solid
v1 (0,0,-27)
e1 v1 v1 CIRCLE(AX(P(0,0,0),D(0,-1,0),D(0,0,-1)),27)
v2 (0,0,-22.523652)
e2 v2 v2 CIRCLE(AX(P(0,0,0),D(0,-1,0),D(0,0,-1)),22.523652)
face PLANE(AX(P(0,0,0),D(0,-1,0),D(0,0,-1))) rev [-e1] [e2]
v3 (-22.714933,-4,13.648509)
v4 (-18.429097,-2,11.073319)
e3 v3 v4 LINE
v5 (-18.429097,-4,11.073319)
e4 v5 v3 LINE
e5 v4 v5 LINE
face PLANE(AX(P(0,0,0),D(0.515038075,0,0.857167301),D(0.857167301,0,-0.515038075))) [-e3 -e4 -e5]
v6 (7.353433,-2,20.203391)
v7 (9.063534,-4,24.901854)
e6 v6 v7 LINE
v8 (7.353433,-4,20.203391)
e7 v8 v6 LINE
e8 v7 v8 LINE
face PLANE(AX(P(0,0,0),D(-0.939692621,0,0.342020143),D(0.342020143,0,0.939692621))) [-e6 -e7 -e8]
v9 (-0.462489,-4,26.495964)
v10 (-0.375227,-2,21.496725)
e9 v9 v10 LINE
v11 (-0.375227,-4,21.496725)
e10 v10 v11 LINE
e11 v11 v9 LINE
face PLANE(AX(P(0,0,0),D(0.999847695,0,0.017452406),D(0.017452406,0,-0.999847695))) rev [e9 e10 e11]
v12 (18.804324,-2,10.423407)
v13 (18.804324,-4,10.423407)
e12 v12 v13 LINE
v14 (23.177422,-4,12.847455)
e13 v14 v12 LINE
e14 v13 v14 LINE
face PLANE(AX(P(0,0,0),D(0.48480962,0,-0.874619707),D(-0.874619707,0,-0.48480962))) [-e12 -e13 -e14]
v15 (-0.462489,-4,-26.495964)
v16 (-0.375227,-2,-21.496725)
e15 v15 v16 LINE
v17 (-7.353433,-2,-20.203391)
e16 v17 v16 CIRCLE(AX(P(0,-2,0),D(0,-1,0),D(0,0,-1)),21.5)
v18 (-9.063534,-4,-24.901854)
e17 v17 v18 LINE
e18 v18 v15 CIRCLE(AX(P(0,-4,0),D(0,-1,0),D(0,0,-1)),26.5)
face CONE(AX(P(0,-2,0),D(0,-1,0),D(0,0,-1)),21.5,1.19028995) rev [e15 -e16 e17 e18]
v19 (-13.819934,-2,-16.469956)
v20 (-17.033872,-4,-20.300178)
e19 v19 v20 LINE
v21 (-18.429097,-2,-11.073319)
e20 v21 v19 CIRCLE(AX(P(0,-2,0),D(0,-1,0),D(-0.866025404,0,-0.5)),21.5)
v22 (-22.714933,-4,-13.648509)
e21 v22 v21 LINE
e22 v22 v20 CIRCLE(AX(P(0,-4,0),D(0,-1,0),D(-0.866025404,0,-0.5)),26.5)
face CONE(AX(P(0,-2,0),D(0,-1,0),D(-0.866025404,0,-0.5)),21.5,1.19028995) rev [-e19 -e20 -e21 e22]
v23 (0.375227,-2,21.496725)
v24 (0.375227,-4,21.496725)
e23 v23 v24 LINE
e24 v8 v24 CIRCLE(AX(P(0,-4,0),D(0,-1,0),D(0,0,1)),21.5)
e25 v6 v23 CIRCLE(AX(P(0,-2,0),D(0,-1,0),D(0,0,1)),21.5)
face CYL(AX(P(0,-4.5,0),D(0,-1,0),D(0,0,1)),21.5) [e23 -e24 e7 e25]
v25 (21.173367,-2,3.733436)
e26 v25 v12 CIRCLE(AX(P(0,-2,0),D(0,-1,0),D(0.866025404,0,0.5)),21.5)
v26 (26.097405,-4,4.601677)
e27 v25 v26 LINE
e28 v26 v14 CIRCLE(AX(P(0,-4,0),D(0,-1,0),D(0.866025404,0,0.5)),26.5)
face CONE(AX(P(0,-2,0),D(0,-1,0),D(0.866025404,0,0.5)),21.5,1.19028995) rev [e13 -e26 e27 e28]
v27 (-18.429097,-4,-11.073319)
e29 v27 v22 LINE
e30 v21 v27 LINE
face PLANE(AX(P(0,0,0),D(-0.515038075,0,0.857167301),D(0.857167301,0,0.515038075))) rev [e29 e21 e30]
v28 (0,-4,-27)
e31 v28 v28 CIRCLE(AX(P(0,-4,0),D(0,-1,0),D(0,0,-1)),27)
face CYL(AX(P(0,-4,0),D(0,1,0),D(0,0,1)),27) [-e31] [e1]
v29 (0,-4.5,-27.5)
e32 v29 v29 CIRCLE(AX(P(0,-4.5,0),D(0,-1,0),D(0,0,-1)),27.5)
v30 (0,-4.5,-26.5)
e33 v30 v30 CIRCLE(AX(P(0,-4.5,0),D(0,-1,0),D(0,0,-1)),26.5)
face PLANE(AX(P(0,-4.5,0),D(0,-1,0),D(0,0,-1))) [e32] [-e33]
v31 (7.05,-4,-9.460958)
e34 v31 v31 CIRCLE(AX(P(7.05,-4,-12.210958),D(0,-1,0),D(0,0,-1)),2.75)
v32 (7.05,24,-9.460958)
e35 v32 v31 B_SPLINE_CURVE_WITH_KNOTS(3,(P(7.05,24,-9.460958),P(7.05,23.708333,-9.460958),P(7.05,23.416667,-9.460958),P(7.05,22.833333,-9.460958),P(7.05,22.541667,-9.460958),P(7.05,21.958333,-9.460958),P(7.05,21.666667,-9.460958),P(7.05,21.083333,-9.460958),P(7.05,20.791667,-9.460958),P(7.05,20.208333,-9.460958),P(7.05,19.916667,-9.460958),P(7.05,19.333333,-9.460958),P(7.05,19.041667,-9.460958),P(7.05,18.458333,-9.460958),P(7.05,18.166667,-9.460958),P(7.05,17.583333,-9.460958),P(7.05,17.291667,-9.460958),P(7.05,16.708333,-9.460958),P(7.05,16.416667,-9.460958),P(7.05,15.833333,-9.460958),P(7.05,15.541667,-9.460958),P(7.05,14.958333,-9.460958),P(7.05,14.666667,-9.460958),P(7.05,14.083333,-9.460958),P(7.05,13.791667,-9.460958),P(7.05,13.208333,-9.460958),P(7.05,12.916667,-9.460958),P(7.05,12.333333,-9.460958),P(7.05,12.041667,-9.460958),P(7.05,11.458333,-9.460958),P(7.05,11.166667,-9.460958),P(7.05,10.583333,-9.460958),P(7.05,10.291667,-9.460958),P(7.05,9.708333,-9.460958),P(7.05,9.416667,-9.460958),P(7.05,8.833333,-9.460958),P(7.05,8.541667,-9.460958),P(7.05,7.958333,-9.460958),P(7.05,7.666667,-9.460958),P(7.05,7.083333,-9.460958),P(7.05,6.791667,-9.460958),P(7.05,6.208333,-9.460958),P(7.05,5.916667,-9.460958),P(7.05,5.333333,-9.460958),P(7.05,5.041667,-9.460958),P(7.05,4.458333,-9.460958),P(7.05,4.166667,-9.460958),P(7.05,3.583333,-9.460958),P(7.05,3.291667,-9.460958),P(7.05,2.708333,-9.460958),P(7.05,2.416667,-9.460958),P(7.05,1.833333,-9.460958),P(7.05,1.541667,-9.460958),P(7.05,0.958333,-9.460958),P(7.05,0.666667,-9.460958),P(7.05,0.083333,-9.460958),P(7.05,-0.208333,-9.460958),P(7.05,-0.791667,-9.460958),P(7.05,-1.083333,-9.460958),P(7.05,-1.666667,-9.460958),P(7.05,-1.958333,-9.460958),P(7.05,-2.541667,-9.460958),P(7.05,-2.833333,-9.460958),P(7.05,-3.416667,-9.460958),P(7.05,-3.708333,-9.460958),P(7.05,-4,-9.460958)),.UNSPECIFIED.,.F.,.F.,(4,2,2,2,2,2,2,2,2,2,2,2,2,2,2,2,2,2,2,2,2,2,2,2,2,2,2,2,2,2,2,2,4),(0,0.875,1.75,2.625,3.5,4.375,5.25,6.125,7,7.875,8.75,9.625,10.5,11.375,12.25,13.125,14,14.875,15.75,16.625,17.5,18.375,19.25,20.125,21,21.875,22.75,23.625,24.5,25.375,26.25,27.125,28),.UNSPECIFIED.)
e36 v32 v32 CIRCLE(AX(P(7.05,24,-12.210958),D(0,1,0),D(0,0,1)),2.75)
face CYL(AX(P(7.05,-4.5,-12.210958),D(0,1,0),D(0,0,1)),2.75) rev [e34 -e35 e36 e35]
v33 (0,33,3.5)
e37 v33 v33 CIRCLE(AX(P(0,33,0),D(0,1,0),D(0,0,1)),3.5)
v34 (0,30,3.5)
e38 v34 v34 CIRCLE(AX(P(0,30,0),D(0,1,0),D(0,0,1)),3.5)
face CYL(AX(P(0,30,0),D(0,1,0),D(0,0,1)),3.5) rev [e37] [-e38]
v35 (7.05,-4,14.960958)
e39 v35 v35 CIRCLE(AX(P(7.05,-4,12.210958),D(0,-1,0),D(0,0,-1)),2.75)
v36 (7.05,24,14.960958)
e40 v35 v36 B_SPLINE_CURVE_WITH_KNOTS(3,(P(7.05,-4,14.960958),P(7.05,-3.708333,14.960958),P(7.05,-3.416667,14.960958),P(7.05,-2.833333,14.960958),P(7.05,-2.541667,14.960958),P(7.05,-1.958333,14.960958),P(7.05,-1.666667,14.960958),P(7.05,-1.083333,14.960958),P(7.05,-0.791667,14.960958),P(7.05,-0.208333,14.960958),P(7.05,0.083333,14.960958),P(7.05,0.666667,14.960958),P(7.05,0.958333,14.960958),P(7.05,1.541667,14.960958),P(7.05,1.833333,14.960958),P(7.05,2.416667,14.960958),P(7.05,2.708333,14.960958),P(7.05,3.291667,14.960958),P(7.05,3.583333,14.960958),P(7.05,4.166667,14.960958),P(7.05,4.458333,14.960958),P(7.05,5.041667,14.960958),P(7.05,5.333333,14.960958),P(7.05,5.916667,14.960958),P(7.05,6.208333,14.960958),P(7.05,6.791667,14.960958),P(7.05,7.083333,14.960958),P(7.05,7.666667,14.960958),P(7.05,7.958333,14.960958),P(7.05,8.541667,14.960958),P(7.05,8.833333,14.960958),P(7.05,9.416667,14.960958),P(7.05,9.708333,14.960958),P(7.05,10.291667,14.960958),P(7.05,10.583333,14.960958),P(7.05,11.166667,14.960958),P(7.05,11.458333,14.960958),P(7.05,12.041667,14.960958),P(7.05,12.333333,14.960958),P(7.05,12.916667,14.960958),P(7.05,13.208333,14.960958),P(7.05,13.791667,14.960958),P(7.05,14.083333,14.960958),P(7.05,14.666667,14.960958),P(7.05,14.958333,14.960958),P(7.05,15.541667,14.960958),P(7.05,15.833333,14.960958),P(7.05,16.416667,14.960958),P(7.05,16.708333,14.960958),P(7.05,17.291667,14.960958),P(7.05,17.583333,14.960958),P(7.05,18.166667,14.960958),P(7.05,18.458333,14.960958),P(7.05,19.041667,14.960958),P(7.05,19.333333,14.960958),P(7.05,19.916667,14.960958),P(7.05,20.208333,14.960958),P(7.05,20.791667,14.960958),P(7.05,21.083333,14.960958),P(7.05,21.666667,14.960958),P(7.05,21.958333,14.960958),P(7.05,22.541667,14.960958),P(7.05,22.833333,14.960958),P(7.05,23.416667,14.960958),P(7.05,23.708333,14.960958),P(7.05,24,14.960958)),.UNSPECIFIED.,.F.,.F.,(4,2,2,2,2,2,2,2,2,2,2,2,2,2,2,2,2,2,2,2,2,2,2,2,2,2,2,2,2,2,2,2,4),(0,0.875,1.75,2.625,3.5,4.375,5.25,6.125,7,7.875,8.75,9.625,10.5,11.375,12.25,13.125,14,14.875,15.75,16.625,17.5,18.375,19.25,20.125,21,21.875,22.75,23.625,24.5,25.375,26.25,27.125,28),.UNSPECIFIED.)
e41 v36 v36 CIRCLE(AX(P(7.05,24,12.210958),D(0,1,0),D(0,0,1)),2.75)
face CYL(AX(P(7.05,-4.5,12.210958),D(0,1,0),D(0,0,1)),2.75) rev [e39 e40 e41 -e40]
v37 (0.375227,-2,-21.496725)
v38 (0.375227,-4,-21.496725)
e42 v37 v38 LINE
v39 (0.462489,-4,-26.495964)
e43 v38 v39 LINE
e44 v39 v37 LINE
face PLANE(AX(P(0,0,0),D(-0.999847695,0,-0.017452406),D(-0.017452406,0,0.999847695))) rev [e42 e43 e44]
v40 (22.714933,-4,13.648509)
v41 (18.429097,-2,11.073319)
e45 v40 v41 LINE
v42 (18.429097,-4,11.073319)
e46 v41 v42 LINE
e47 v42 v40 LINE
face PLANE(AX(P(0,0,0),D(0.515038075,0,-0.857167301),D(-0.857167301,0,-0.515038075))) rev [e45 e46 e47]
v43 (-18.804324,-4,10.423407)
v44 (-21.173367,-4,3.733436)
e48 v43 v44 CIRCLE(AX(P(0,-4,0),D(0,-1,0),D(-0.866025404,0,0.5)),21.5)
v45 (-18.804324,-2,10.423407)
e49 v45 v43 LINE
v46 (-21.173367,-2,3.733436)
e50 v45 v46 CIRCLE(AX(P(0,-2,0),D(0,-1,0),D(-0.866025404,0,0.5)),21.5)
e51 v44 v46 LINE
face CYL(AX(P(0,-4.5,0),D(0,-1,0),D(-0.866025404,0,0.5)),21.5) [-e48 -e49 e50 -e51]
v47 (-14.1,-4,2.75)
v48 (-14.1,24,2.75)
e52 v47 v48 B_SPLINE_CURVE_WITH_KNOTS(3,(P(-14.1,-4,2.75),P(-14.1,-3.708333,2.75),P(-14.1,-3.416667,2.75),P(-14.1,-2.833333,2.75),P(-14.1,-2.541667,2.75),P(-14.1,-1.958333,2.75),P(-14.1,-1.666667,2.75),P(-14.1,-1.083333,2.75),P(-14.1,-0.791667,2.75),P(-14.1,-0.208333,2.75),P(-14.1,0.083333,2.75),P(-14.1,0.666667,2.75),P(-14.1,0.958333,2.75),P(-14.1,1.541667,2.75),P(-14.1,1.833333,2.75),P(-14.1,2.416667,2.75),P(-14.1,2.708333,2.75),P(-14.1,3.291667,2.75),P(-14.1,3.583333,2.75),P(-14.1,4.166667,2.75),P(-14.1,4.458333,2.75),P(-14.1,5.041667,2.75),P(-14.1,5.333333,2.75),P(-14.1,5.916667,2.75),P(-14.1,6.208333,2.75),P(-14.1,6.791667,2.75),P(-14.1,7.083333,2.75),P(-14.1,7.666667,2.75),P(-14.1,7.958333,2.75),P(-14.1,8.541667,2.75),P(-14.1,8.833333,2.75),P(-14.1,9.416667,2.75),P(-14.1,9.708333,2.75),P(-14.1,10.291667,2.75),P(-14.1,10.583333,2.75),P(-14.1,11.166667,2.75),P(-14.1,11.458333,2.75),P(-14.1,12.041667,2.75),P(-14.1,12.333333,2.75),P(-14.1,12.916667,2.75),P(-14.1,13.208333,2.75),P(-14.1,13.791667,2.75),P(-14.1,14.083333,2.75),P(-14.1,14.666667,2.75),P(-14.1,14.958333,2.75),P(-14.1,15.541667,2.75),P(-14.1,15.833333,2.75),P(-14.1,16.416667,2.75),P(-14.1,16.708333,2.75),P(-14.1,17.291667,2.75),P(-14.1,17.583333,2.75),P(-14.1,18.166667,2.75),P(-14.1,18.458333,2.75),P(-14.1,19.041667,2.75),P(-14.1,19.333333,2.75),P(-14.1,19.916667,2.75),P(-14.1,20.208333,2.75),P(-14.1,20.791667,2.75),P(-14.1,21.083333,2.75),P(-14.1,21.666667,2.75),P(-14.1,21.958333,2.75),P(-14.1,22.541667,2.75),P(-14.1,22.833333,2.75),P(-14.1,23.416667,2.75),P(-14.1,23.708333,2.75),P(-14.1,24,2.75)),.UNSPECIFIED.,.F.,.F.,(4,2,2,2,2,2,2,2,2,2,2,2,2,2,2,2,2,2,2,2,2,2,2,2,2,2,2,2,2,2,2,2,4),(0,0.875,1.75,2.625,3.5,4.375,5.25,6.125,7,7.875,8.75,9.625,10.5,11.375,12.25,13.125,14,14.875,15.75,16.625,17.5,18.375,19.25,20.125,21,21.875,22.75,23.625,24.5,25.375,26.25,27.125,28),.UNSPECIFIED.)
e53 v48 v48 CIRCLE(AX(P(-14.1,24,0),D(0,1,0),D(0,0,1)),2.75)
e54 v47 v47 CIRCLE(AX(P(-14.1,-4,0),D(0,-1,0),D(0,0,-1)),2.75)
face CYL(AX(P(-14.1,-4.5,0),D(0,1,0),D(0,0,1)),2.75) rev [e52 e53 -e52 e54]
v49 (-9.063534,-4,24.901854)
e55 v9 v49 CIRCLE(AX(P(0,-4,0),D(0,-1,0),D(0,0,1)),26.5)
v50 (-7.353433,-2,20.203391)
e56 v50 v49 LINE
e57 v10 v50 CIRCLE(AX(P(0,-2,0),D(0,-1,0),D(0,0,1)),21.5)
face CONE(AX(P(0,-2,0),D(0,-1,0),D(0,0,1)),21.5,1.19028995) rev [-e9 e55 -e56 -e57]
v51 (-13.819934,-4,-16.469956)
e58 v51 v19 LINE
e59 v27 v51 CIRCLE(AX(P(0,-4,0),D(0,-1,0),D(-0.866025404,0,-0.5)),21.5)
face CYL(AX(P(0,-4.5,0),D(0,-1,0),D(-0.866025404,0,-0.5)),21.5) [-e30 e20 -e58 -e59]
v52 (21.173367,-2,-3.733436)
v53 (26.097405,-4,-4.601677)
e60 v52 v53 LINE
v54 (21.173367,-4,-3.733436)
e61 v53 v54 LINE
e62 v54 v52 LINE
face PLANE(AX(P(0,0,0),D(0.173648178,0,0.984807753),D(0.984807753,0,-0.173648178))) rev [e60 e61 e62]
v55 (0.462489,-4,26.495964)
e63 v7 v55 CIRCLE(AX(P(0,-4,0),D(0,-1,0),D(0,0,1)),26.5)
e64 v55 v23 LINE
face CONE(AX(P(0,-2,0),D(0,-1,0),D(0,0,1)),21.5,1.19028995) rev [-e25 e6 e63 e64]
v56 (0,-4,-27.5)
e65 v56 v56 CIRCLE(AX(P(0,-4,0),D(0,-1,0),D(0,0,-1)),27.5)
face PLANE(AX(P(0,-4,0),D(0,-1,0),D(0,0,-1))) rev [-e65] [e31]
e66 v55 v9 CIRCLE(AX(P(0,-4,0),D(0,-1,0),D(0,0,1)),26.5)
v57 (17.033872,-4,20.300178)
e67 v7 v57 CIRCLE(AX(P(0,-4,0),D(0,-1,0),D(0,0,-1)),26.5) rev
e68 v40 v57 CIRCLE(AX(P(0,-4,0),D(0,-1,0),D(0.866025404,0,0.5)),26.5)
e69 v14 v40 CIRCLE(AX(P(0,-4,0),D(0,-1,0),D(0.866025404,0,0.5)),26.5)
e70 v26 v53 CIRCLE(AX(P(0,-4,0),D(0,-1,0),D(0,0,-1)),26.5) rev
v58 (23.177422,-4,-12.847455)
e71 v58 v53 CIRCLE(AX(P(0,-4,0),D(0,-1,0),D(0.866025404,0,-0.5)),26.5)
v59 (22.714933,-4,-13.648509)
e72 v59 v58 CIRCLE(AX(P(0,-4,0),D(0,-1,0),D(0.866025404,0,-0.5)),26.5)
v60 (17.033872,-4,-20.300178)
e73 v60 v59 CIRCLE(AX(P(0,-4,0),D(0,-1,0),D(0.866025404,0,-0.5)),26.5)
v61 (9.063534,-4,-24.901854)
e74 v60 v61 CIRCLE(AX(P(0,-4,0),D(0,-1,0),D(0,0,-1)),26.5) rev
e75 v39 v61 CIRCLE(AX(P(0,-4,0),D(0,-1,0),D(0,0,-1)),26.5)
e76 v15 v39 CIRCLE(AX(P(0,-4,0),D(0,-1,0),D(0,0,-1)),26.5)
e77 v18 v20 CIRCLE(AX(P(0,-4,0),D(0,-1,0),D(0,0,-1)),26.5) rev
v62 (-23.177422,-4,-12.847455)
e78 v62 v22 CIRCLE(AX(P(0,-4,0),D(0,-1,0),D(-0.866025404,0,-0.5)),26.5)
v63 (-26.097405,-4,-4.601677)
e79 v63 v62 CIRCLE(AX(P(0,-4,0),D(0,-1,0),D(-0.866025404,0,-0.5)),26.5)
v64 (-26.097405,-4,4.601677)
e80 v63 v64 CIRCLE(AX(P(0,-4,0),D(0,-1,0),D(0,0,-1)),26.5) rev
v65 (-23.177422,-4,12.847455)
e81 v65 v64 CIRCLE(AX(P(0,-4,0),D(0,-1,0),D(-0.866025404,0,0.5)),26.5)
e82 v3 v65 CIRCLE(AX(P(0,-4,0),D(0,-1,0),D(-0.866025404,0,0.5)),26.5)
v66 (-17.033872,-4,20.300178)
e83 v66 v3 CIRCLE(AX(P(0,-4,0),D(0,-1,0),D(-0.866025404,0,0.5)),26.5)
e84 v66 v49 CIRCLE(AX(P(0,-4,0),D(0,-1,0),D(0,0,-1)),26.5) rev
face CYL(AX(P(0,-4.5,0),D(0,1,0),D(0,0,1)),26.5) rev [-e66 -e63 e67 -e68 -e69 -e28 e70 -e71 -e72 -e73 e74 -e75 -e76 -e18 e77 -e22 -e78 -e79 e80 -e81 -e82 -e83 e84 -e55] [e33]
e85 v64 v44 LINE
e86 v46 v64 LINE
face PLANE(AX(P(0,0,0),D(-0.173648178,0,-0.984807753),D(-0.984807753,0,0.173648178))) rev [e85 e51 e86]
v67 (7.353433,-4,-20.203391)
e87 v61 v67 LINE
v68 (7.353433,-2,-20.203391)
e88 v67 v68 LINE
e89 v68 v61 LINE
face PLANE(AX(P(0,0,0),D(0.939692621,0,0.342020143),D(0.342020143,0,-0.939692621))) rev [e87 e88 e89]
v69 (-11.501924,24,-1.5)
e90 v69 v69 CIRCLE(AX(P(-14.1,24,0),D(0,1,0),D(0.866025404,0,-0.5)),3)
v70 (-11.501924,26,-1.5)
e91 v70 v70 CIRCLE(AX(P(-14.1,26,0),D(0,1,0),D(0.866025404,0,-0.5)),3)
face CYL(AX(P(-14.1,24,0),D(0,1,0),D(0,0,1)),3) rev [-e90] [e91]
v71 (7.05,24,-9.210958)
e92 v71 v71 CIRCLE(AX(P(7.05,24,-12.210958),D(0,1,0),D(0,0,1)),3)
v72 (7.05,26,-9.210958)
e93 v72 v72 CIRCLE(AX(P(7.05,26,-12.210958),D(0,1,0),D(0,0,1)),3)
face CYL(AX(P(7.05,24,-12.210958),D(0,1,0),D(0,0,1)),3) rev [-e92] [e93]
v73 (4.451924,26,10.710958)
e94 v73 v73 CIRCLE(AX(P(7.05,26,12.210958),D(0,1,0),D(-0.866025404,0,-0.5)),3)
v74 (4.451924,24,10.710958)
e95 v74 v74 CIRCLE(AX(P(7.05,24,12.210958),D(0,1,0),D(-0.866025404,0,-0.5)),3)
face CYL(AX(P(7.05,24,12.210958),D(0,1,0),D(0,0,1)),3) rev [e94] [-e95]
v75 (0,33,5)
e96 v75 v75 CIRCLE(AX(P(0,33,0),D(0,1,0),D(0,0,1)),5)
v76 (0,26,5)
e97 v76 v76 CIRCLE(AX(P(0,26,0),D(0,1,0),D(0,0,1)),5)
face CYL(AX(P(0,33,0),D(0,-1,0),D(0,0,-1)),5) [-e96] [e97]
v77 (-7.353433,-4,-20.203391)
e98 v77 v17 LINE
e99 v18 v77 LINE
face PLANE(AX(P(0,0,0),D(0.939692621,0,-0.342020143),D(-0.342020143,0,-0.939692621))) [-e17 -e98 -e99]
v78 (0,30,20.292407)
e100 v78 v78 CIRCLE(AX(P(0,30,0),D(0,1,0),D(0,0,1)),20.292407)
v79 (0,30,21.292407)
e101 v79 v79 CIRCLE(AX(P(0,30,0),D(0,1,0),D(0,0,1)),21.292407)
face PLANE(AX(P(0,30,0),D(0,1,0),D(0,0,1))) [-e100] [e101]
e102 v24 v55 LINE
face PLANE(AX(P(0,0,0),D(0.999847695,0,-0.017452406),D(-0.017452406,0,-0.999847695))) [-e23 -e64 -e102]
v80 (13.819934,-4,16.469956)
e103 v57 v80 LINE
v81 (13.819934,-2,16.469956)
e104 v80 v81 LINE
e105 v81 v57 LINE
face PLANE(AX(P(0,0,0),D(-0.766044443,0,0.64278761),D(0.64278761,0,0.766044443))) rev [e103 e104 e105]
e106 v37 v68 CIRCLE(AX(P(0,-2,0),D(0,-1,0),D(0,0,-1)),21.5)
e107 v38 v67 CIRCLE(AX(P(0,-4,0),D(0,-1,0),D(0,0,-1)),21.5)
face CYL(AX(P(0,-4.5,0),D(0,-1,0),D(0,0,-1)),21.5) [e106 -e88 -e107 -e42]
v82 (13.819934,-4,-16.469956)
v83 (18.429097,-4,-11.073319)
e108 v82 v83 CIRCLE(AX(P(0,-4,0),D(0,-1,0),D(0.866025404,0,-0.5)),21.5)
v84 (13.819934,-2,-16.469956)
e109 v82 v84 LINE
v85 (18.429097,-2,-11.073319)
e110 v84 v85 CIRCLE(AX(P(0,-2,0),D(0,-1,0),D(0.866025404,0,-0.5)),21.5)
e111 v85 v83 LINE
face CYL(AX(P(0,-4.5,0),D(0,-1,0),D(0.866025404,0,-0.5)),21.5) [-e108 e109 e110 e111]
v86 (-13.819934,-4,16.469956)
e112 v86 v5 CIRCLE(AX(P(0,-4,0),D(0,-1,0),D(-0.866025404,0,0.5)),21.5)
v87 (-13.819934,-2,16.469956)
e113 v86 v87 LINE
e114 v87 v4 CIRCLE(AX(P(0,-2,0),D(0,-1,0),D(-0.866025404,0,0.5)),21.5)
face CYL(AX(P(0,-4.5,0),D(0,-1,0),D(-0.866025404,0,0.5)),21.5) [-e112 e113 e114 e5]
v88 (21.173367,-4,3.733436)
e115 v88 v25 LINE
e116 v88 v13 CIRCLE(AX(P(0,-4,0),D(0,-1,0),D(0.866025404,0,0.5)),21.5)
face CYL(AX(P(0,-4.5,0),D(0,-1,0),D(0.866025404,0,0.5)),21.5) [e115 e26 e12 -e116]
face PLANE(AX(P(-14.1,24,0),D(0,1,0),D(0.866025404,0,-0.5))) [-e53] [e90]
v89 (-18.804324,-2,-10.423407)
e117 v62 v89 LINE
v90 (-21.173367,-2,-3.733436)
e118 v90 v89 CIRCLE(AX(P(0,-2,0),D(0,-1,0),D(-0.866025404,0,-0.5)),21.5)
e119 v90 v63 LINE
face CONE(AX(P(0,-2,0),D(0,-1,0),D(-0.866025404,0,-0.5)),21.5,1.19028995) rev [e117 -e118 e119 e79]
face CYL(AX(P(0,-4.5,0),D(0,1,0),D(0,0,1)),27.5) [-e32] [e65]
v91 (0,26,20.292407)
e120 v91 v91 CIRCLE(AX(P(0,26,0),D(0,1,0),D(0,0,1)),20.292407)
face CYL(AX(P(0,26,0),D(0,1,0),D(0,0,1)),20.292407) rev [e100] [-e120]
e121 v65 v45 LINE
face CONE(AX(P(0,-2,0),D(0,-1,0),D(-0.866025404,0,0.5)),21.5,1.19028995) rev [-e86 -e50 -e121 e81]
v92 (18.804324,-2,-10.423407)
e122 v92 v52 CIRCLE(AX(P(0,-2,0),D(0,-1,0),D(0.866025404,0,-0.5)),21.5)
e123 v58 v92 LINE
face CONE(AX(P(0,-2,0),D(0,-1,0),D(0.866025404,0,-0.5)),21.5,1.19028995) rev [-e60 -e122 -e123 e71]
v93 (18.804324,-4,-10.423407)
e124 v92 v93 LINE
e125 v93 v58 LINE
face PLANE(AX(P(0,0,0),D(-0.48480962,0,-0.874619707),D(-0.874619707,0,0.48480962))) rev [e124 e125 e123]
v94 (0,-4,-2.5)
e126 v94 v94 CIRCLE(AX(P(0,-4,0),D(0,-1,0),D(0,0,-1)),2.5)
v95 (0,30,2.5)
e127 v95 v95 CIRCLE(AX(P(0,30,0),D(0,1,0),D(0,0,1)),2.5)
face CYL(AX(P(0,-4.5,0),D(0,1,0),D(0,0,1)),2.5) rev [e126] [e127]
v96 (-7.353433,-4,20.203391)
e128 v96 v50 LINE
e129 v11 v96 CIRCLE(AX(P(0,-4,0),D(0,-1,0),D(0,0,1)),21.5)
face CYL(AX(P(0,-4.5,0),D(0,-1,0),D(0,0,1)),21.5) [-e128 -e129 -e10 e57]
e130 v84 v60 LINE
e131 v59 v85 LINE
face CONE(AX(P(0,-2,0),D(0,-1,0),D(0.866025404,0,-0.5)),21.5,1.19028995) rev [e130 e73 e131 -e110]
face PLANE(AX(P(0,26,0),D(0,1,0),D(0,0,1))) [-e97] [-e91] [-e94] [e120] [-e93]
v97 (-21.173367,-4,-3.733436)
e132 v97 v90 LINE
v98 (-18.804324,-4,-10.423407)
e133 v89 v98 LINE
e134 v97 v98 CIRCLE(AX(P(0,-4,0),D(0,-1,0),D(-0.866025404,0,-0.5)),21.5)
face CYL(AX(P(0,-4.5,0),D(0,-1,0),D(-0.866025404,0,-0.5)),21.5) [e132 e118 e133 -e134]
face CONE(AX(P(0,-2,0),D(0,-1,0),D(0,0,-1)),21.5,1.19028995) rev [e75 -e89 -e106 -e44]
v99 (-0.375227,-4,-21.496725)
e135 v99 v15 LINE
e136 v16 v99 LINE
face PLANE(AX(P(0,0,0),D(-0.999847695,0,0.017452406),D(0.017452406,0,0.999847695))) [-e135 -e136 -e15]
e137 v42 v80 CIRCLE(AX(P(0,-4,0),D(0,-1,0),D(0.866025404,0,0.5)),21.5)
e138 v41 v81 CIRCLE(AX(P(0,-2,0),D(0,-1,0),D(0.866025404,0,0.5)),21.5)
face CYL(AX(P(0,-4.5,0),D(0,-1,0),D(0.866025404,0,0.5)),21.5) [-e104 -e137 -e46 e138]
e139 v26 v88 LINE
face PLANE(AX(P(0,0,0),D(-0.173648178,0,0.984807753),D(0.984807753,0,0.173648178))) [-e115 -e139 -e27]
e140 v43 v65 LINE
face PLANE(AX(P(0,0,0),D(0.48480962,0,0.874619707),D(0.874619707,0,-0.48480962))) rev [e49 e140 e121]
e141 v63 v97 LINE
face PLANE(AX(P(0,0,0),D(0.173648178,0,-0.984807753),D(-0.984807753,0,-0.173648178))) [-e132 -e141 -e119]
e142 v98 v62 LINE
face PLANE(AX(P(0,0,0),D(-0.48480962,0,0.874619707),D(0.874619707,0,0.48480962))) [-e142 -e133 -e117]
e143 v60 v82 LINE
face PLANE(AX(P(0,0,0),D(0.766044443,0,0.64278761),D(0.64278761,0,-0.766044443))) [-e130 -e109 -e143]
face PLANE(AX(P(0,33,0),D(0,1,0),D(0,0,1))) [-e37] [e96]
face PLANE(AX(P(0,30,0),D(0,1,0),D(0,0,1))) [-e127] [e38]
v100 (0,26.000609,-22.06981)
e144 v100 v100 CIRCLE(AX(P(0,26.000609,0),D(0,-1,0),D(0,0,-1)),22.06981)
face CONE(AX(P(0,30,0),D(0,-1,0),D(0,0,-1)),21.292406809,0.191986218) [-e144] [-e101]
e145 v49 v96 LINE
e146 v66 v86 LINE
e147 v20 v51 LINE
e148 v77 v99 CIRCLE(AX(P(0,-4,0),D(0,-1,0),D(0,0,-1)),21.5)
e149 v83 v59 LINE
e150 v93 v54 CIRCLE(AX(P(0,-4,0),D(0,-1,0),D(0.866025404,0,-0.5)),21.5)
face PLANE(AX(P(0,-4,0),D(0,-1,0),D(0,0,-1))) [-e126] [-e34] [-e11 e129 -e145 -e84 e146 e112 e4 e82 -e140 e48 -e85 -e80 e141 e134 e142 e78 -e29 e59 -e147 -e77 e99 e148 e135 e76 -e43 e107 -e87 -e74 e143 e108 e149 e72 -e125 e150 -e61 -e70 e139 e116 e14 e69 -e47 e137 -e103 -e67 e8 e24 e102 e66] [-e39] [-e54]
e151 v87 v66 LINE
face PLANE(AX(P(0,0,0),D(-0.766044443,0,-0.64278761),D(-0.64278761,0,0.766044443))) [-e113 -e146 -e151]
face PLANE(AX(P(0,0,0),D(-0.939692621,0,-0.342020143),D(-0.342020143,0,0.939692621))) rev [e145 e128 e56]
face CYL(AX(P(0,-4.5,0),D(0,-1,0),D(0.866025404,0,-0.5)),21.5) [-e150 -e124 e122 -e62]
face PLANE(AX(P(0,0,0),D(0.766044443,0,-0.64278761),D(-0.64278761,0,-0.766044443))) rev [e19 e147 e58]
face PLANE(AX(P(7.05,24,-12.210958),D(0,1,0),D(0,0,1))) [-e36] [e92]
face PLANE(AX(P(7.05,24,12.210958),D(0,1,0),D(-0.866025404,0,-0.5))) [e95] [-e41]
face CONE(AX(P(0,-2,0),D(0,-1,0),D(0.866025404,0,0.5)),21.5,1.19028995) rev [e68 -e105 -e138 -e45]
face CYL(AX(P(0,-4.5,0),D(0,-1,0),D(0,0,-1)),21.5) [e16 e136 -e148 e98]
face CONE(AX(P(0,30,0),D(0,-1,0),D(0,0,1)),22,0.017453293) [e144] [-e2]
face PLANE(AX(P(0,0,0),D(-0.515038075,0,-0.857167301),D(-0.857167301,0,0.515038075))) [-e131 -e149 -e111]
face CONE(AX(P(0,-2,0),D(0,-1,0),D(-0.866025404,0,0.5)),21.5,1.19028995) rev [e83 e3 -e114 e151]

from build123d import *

# Parameters (mm, degrees)
SCHIZZO1_R                    = 22
ESTRUSIONE_ESTRUSIONE1_DEPTH  = 30
SFORMO1_ANGLE                 = 1
SMUSSO1_SIZE                  = 4
SMUSSO1_SIZE2                 = 0.707593191
SCHIZZO2_R                    = 20.292406809
TAGLIO_ESTRUSIONE1_DEPTH      = 4
SCHIZZO4_R                    = 3
TAGLIO_ESTRUSIONE2_DEPTH      = 2
SCHIZZO3_R                    = 5
ESTRUSIONE_ESTRUSIONE2_DEPTH  = 7
SCHIZZO6_R                    = 3.5
TAGLIO_ESTRUSIONE5_DEPTH      = 3
SCHIZZO14_R                   = 27
SCHIZZO14_R_2                 = 22.5
ESTRUSIONE_ESTRUSIONE8_DEPTH  = 4
SCHIZZO16_R                   = 27.5
SCHIZZO16_R_2                 = 26.5
ESTRUSIONE_ESTRUSIONE9_DEPTH  = 0.5
SCHIZZO21_R                   = 22.5
ESTRUSIONE_ESTRUSIONE12_DEPTH = 4
SCHIZZO5_R                    = 2.75
TAGLIO_ESTRUSIONE3_DEPTH      = 49.215661356
RIPETIZIONECIRCOLARE1_COUNT   = 3
SCHIZZO24_R                   = 2.5
TAGLIO_ESTRUSIONE11_DEPTH     = 52.98797938
TAGLIA_RIVOLUZIONE1_ANGLE     = 40
RIVOLUZIONE1_ANGLE            = 2
RIPETIZIONECIRCOLARE2_COUNT   = 6


# Read off the part's stored shape, not the designer's step: Taglia-Rivoluzione1
with BuildPart() as part:
    # Schizzo1 → Estrusione-Estrusione1 (new body)
    with BuildSketch(Plane(origin=(0, 0, 0), x_dir=(1, 0, 0), z_dir=(0, 1, 0))):
        with Locations(Location((0, 0, 0), (0, 0, 270))):
            Circle(SCHIZZO1_R)
    extrude(amount=ESTRUSIONE_ESTRUSIONE1_DEPTH)

    # Sformo1
    sformo1_faces = [part.faces().sort_by_distance(p)[0] for p in [
        (0, 15, -22),
    ]]
    draft(sformo1_faces, Plane.ZX.offset(30), SFORMO1_ANGLE)

    # Smusso1
    smusso1_edges = [part.edges().sort_by_distance(p)[0] for p in [
        (0, 30, -22),
    ]]
    smusso1_side = [part.faces().sort_by_distance(p)[0] for p in [
        (0, 15, -22.261825974),
    ]]
    chamfer(smusso1_edges, length=SMUSSO1_SIZE, length2=SMUSSO1_SIZE2, reference=smusso1_side[0])

    # Schizzo2 → Taglio-Estrusione1 (cut)
    with BuildSketch(Plane(origin=(0, 30, 0), x_dir=(1, 0, 0), z_dir=(0, 1, 0))):
        with Locations(Location((0, 0, 0), (0, 0, 270))):
            Circle(SCHIZZO2_R)
    extrude(amount=-TAGLIO_ESTRUSIONE1_DEPTH, mode=Mode.SUBTRACT)

    # Schizzo4 → Taglio-Estrusione2 (cut)
    with BuildSketch(Plane(origin=(0, 26, 0), x_dir=(1, 0, 0), z_dir=(0, 1, 0))):
        with Locations(Location((7.05, 12.210958193, 0), (0, 0, 270))):
            Circle(SCHIZZO4_R)
    taglio_estrusione2 = extrude(amount=-TAGLIO_ESTRUSIONE2_DEPTH, mode=Mode.SUBTRACT)

    # Schizzo3 → Estrusione-Estrusione2 (add)
    with BuildSketch(Plane(origin=(0, 26, 0), x_dir=(1, 0, 0), z_dir=(0, 1, 0))):
        with Locations(Location((0, 0, 0), (0, 0, 270))):
            Circle(SCHIZZO3_R)
    extrude(amount=ESTRUSIONE_ESTRUSIONE2_DEPTH)

    # Schizzo6 → Taglio-Estrusione5 (cut)
    with BuildSketch(Plane(origin=(0, 33, 0), x_dir=(1, 0, 0), z_dir=(0, 1, 0))):
        with Locations(Location((0, 0, 0), (0, 0, 270))):
            Circle(SCHIZZO6_R)
    extrude(amount=-TAGLIO_ESTRUSIONE5_DEPTH, mode=Mode.SUBTRACT)

    # Schizzo14 → Estrusione-Estrusione8 (add)
    with BuildSketch(Plane.XZ):
        with Locations(Location((0, 0, 0), (0, 0, 270))):
            Circle(SCHIZZO14_R)
        with Locations(Location((0, 0, 0), (0, 0, 270))):
            Circle(SCHIZZO14_R_2, mode=Mode.SUBTRACT)
    extrude(amount=ESTRUSIONE_ESTRUSIONE8_DEPTH)

    # Schizzo16 → Estrusione-Estrusione9 (add)
    with BuildSketch(Plane.XZ.offset(4)):
        with Locations(Location((0, 0, 0), (0, 0, 270))):
            Circle(SCHIZZO16_R)
        with Locations(Location((0, 0, 0), (0, 0, 270))):
            Circle(SCHIZZO16_R_2, mode=Mode.SUBTRACT)
    extrude(amount=ESTRUSIONE_ESTRUSIONE9_DEPTH)

    # Schizzo21 → Estrusione-Estrusione12 (add)
    with BuildSketch(Plane.XZ):
        Circle(SCHIZZO21_R)
    extrude(amount=ESTRUSIONE_ESTRUSIONE12_DEPTH)

    # Schizzo5 → Taglio-Estrusione3 (cut, symmetric)
    with BuildSketch(Plane(origin=(0, 24, 0), x_dir=(1, 0, 0), z_dir=(0, 1, 0))):
        with Locations(Location((7.05, 12.210958193, 0), (0, 0, 270))):
            Circle(SCHIZZO5_R)
    taglio_estrusione3 = extrude(amount=TAGLIO_ESTRUSIONE3_DEPTH, both=True, mode=Mode.SUBTRACT)

    # RipetizioneCircolare1: Taglio-Estrusione2, Taglio-Estrusione3 ×3 about axis
    ripetizionecircolare1_axis = Axis((0, 0, 0), (0, 1, 0))
    add([taglio_estrusione2.rotate(ripetizionecircolare1_axis, i * 360 / RIPETIZIONECIRCOLARE1_COUNT) for i in range(1, RIPETIZIONECIRCOLARE1_COUNT)], mode=Mode.SUBTRACT)
    add([taglio_estrusione3.rotate(ripetizionecircolare1_axis, i * 360 / RIPETIZIONECIRCOLARE1_COUNT) for i in range(1, RIPETIZIONECIRCOLARE1_COUNT)], mode=Mode.SUBTRACT)

    # Schizzo24 → Taglio-Estrusione11 (cut, through all)
    with BuildSketch(Plane(origin=(0, 30, 0), x_dir=(1, 0, 0), z_dir=(0, 1, 0))):
        with Locations(Location((0, 0, 0), (0, 0, 270))):
            Circle(SCHIZZO24_R)
    extrude(amount=-TAGLIO_ESTRUSIONE11_DEPTH, mode=Mode.SUBTRACT)

    # Taglia-Rivoluzione1 outline → Taglia-Rivoluzione1 (revolve, cut)
    with BuildSketch(Plane(origin=(0, 0, 0), x_dir=(0.3420201433256628, 0, -0.9396926207859105), z_dir=(0.9396926207859105, 0, 0.3420201433256628))):
        Polygon((26.5, -4), (21.5, -2), (21.5, -4), align=None)
    taglia_rivoluzione1 = revolve(axis=Axis((0, 0, 0), (0, 1, 0)), revolution_arc=TAGLIA_RIVOLUZIONE1_ANGLE, mode=Mode.SUBTRACT)

    # Schizzo28 → Rivoluzione1 (revolve, symmetric)
    with BuildSketch(Plane(origin=(0, 0, 0), x_dir=(0, 0, -1), z_dir=(1, 0, 0))) as rivoluzione1_sk:
        Polygon((21.5, -4), (21.5, -2), (26.5, -4), align=None)
    rivoluzione1 = revolve(axis=Axis((0, -4.5, 0), (0, 1, 0)), revolution_arc=RIVOLUZIONE1_ANGLE / 2)
    rivoluzione1 = rivoluzione1 + revolve(rivoluzione1_sk.sketch, axis=Axis((0, -4.5, 0), (0, -1, 0)), revolution_arc=RIVOLUZIONE1_ANGLE / 2)

    # RipetizioneCircolare2: Taglia-Rivoluzione1, Rivoluzione1 ×6 about axis
    ripetizionecircolare2_axis = Axis((0, 0, 0), (0, 1, 0))
    add([taglia_rivoluzione1.rotate(ripetizionecircolare2_axis, i * 360 / RIPETIZIONECIRCOLARE2_COUNT) for i in range(1, RIPETIZIONECIRCOLARE2_COUNT)], mode=Mode.SUBTRACT)
    add([rivoluzione1.rotate(ripetizionecircolare2_axis, i * 360 / RIPETIZIONECIRCOLARE2_COUNT) for i in range(1, RIPETIZIONECIRCOLARE2_COUNT)])


solid = part.part
